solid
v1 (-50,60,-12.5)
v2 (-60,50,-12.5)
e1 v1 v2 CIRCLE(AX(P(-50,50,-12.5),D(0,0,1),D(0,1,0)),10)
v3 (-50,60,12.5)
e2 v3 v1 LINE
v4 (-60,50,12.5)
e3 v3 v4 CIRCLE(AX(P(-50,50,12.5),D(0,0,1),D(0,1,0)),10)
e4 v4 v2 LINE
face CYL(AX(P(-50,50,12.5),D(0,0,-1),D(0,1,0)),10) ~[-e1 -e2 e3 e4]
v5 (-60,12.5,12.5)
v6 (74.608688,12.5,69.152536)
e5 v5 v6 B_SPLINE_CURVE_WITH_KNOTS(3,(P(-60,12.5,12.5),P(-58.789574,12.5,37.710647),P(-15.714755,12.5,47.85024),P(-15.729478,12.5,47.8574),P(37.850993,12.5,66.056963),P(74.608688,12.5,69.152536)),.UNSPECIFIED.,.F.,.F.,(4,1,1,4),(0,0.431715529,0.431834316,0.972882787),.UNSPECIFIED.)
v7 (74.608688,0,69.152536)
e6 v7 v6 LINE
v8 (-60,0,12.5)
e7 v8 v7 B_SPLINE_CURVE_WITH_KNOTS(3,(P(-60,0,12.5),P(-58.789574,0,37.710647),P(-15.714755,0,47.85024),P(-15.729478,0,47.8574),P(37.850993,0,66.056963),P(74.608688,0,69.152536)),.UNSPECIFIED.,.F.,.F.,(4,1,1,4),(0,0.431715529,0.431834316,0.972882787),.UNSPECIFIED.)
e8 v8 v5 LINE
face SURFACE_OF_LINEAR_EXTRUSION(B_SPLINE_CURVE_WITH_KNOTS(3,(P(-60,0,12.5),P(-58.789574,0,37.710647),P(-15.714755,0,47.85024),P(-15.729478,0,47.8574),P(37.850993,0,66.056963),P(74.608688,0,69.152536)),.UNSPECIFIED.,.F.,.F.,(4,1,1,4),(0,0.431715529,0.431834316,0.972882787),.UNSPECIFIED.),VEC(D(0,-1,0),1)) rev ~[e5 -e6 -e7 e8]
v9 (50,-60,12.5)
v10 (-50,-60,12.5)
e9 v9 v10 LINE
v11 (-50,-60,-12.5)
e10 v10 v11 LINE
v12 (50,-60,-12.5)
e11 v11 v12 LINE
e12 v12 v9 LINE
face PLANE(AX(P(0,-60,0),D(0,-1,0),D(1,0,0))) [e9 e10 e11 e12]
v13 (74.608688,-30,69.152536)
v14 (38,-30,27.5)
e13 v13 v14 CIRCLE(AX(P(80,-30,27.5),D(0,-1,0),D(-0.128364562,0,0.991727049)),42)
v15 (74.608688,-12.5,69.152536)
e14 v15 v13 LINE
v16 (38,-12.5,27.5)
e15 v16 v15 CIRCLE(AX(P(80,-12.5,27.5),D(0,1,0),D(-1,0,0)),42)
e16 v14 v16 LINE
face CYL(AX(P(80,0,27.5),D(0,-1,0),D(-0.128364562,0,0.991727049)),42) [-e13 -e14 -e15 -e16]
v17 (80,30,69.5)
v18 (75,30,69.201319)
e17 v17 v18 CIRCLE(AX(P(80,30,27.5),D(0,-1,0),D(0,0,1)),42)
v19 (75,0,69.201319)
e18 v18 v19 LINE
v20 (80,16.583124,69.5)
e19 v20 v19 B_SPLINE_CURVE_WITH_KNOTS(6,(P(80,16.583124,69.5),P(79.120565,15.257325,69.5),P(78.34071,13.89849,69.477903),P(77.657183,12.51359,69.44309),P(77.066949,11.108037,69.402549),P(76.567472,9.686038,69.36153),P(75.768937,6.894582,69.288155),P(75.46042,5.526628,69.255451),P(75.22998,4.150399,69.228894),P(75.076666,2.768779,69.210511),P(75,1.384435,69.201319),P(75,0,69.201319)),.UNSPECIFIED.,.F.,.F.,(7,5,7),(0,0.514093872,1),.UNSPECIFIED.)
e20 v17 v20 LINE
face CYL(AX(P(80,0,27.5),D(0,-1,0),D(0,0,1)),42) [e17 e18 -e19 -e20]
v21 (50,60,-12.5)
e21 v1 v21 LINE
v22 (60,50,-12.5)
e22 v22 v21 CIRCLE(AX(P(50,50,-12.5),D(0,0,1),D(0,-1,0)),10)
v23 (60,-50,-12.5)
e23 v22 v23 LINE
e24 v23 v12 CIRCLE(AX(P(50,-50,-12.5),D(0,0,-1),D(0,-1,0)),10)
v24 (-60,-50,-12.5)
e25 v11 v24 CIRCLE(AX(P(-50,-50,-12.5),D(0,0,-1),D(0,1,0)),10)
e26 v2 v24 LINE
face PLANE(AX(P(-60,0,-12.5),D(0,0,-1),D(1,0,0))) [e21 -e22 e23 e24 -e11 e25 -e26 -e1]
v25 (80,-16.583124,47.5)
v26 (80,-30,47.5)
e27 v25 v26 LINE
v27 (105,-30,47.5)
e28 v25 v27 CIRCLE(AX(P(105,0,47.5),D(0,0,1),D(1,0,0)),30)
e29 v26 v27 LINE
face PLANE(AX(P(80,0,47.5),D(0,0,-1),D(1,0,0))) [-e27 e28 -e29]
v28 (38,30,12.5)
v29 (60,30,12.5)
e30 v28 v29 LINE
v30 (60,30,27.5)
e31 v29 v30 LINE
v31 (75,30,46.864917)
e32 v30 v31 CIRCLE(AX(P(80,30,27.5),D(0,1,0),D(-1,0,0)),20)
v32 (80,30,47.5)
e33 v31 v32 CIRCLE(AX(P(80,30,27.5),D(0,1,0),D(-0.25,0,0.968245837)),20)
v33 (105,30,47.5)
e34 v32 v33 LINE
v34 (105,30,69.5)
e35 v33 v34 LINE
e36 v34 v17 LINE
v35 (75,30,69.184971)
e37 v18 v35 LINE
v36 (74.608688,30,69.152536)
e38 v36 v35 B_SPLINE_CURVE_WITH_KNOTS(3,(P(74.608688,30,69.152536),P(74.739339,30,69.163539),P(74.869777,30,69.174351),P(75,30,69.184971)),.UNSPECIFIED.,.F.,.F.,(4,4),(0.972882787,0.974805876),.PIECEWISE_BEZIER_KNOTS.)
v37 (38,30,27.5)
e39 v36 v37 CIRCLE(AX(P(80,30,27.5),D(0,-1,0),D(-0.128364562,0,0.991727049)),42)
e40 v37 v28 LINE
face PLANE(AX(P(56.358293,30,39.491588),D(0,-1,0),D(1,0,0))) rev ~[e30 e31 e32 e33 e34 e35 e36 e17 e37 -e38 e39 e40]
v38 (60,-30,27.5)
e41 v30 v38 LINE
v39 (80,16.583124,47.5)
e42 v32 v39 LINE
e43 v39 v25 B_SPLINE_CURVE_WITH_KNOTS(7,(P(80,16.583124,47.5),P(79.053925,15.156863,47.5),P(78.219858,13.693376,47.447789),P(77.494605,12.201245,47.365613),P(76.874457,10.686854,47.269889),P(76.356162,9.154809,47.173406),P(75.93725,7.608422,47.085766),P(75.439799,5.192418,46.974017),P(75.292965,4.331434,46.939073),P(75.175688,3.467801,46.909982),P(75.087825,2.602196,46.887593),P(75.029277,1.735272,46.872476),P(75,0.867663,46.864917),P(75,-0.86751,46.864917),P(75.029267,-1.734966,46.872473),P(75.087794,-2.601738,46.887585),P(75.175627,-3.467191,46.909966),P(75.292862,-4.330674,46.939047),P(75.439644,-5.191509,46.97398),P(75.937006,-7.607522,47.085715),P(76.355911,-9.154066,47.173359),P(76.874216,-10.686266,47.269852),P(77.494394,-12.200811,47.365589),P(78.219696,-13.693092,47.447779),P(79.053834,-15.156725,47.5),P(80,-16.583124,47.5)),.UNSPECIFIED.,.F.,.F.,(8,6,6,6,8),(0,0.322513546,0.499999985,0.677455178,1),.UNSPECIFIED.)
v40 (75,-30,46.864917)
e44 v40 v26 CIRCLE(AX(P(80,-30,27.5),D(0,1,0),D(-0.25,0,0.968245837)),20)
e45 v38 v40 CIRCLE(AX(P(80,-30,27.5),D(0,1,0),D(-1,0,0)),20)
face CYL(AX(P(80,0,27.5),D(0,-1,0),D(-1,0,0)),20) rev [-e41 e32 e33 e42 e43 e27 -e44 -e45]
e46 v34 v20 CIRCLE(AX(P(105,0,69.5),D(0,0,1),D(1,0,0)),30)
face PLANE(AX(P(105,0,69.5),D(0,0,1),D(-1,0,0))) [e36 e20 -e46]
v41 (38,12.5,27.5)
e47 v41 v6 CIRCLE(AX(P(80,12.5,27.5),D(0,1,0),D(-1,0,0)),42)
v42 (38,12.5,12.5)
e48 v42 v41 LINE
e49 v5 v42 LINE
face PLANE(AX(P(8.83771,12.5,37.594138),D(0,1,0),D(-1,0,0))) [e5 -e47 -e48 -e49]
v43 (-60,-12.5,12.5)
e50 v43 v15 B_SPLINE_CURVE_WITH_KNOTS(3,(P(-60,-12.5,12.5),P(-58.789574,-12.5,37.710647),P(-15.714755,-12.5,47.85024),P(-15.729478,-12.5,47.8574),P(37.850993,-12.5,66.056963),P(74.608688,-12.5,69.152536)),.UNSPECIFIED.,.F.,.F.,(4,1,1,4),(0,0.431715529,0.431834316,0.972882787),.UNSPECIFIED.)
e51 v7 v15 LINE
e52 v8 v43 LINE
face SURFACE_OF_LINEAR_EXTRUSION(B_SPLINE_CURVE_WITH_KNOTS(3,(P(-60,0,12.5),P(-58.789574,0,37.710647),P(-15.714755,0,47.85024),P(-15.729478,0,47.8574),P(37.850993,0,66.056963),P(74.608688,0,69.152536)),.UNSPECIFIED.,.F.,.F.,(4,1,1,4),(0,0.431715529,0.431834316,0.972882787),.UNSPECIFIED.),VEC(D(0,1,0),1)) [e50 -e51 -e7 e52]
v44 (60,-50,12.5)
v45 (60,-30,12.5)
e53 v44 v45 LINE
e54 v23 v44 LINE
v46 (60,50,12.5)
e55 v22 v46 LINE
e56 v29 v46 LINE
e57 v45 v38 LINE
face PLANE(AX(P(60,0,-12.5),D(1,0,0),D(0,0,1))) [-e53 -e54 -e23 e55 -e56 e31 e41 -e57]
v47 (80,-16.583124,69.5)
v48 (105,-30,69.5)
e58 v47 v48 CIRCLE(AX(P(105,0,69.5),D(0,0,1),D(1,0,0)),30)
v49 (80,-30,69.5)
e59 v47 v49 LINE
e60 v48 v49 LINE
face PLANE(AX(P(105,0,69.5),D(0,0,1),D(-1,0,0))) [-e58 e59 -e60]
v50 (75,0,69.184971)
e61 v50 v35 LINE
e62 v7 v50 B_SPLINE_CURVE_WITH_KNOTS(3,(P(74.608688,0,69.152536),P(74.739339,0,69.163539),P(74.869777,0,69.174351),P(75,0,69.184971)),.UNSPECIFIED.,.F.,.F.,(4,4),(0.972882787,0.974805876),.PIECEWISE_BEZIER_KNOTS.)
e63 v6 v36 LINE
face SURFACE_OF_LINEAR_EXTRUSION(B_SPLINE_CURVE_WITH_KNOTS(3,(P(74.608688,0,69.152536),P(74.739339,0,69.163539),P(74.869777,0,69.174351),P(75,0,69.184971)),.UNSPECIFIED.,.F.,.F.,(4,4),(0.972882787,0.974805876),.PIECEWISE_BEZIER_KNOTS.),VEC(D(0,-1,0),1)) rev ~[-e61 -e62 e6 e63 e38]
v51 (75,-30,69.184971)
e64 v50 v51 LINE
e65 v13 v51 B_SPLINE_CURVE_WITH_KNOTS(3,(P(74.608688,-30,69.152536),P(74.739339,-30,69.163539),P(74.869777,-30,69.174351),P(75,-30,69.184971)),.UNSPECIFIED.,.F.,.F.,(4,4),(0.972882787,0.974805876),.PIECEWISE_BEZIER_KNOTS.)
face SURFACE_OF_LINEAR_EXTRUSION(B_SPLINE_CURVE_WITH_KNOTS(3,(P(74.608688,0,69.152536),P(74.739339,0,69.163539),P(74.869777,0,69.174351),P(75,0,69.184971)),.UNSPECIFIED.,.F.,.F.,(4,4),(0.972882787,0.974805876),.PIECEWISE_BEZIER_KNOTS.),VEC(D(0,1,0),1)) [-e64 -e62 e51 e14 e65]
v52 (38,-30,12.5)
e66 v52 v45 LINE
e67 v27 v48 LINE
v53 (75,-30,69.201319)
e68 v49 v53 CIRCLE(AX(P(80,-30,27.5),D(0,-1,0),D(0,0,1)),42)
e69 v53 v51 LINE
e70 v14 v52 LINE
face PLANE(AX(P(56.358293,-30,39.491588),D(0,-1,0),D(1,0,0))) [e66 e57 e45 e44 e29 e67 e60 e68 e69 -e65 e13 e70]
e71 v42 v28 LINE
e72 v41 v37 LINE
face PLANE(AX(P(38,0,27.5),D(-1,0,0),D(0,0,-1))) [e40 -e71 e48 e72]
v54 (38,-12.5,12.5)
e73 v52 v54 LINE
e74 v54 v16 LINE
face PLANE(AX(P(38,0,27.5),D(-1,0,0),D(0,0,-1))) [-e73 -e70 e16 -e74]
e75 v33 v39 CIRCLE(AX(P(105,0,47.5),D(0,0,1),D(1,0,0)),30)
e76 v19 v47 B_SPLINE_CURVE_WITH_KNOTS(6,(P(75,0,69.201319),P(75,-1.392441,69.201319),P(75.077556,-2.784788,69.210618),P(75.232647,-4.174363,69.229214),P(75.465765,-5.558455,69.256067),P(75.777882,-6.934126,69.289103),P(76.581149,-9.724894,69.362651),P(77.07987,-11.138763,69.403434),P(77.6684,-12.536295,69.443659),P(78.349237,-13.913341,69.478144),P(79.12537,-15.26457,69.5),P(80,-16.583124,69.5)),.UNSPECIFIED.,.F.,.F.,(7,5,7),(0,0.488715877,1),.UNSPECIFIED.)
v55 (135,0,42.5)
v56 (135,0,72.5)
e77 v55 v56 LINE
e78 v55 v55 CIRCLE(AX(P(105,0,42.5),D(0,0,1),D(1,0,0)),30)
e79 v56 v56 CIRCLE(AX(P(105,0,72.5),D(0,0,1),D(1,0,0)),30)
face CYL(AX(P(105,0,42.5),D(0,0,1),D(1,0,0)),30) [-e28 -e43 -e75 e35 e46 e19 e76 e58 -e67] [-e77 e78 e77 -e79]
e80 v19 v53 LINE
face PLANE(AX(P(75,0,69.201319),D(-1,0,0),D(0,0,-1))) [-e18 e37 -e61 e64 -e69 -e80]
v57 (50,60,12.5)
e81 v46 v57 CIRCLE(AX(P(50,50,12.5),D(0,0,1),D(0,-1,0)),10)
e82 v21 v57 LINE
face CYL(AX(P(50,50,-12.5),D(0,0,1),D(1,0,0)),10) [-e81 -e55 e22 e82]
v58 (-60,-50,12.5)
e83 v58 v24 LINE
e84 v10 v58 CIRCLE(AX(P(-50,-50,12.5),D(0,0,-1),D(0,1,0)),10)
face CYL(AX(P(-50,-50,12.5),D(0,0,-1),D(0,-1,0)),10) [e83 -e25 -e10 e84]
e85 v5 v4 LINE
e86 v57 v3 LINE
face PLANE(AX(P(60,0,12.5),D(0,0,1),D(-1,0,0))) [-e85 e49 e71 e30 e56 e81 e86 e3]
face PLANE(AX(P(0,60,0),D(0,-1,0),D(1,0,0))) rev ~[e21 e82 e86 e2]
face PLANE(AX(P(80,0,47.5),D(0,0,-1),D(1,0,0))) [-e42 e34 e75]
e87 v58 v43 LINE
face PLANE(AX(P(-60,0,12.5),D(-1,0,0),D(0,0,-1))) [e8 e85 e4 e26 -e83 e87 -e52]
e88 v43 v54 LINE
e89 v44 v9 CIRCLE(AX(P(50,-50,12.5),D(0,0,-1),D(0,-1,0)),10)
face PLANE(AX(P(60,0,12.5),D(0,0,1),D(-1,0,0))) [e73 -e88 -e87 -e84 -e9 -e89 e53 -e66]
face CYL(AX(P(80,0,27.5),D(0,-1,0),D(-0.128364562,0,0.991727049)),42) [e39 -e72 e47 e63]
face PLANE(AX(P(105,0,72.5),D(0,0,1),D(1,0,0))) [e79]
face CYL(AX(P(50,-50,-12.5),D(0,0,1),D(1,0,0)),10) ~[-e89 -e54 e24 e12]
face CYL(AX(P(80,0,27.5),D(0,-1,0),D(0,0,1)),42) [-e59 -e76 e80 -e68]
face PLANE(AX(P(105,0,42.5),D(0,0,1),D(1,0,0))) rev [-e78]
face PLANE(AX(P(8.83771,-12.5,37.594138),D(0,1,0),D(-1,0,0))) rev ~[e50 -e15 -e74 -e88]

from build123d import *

# Parameters (mm, degrees)
F1_DEPTH = 60
F2_DEPTH = 30
F3_DEPTH = 12.5
F5_R     = 10


# Not quite as in the source:
# - a feature names something its author has since deleted; it is built from what else it names


with BuildPart() as f1:
    # F0 (on Front) → F1 (new body, symmetric)
    with BuildSketch(Plane.XZ):
        Polygon((-60, 12.5), (-60, -12.5), (60, -12.5), (60, 12.5), (38, 12.5), align=None)
    extrude(amount=F1_DEPTH, both=True)

    # F0 (on Front) → F2 (join, symmetric)
    with BuildSketch(Plane.XZ):
        with BuildLine():
            Line((38, 12.5), (60, 12.5))
            Line((60, 12.5), (60, 27.5))
            ThreePointArc((60, 27.5), (64.1886116992, 39.7474487139), (75, 46.864916731))
            Line((75, 46.864916731), (75, 69.1849707307))
            add(Edge.make_bspline(
                [(74.6086884092, 69.1525360492), (74.7393390429, 69.163538875), (74.8697772932, 69.1743509337), (75, 69.1849707307)],
                knots=[0.9728827871, 0.9728827871, 0.9728827871, 0.9728827871, 0.9748058763, 0.9748058763, 0.9748058763, 0.9748058763], degree=3))
            ThreePointArc((74.6086884092, 69.1525360492), (48.4529313025, 55.2269265623), (38, 27.5))
            Line((38, 27.5), (38, 12.5))
        make_face()
        with BuildLine():
            ThreePointArc((80, 69.5), (77.4955434529, 69.425263236), (75, 69.201318924))
            Line((75, 69.201318924), (75, 69.1849707307))
            add(Edge.make_bspline(
                [(75, 69.1849707307), (76.7060295657, 69.324099213), (78.3750648422, 69.4302293108), (80, 69.5)],
                knots=[0.9748058763, 0.9748058763, 0.9748058763, 0.9748058763, 1, 1, 1, 1], degree=3))
        make_face()
        with BuildLine():
            add(Edge.make_bspline(
                [(75, 69.1849707307), (76.7060295657, 69.324099213), (78.3750648422, 69.4302293108), (80, 69.5)],
                knots=[0.9748058763, 0.9748058763, 0.9748058763, 0.9748058763, 1, 1, 1, 1], degree=3))
            Line((75, 69.1849707307), (75, 46.864916731))
            ThreePointArc((75, 46.864916731), (77.4799141503, 47.3405939253), (80, 47.5))
            Line((80, 47.5), (105, 47.5))
            Line((105, 47.5), (105, 69.5))
            Line((105, 69.5), (80, 69.5))
        make_face()
    extrude(amount=F2_DEPTH, both=True)

    # F0 (on Front) → F3 (join, symmetric)
    with BuildSketch(Plane.XZ):
        with BuildLine():
            add(Edge.make_bspline(
                [(-60, 12.5), (-58.7895740645, 37.710647482), (-15.7147551824, 47.8502400891), (-15.7294783827, 47.857399648), (37.8509932243, 66.056963491), (74.6086884092, 69.1525360492)],
                knots=[0, 0, 0, 0, 0.4317155285, 0.4318343159, 0.9728827871, 0.9728827871, 0.9728827871, 0.9728827871], degree=3))
            Line((-60, 12.5), (38, 12.5))
            Line((38, 12.5), (38, 27.5))
            ThreePointArc((38, 27.5), (48.4529313025, 55.2269265623), (74.6086884092, 69.1525360492))
        make_face()
    extrude(amount=F3_DEPTH, both=True)

    # F0 (on Front) → F4 (revolve)
    with BuildSketch(Plane.XZ):
        Polygon((135, 72.5), (105, 72.5), (105, 69.5), (105, 47.5), (105, 42.5), (135, 42.5), align=None)
    revolve(axis=Axis((105, 0, 58.5), (0, 0, 1)))

    # F5
    f5_edges = [f1.edges().sort_by_distance(p)[0] for p in [
        (-60, -60, 0),
        (60, -60, 0),
        (60, 60, 0),
        (-60, 60, 0),
    ]]
    fillet(f5_edges, radius=F5_R)


solid = f1.part
